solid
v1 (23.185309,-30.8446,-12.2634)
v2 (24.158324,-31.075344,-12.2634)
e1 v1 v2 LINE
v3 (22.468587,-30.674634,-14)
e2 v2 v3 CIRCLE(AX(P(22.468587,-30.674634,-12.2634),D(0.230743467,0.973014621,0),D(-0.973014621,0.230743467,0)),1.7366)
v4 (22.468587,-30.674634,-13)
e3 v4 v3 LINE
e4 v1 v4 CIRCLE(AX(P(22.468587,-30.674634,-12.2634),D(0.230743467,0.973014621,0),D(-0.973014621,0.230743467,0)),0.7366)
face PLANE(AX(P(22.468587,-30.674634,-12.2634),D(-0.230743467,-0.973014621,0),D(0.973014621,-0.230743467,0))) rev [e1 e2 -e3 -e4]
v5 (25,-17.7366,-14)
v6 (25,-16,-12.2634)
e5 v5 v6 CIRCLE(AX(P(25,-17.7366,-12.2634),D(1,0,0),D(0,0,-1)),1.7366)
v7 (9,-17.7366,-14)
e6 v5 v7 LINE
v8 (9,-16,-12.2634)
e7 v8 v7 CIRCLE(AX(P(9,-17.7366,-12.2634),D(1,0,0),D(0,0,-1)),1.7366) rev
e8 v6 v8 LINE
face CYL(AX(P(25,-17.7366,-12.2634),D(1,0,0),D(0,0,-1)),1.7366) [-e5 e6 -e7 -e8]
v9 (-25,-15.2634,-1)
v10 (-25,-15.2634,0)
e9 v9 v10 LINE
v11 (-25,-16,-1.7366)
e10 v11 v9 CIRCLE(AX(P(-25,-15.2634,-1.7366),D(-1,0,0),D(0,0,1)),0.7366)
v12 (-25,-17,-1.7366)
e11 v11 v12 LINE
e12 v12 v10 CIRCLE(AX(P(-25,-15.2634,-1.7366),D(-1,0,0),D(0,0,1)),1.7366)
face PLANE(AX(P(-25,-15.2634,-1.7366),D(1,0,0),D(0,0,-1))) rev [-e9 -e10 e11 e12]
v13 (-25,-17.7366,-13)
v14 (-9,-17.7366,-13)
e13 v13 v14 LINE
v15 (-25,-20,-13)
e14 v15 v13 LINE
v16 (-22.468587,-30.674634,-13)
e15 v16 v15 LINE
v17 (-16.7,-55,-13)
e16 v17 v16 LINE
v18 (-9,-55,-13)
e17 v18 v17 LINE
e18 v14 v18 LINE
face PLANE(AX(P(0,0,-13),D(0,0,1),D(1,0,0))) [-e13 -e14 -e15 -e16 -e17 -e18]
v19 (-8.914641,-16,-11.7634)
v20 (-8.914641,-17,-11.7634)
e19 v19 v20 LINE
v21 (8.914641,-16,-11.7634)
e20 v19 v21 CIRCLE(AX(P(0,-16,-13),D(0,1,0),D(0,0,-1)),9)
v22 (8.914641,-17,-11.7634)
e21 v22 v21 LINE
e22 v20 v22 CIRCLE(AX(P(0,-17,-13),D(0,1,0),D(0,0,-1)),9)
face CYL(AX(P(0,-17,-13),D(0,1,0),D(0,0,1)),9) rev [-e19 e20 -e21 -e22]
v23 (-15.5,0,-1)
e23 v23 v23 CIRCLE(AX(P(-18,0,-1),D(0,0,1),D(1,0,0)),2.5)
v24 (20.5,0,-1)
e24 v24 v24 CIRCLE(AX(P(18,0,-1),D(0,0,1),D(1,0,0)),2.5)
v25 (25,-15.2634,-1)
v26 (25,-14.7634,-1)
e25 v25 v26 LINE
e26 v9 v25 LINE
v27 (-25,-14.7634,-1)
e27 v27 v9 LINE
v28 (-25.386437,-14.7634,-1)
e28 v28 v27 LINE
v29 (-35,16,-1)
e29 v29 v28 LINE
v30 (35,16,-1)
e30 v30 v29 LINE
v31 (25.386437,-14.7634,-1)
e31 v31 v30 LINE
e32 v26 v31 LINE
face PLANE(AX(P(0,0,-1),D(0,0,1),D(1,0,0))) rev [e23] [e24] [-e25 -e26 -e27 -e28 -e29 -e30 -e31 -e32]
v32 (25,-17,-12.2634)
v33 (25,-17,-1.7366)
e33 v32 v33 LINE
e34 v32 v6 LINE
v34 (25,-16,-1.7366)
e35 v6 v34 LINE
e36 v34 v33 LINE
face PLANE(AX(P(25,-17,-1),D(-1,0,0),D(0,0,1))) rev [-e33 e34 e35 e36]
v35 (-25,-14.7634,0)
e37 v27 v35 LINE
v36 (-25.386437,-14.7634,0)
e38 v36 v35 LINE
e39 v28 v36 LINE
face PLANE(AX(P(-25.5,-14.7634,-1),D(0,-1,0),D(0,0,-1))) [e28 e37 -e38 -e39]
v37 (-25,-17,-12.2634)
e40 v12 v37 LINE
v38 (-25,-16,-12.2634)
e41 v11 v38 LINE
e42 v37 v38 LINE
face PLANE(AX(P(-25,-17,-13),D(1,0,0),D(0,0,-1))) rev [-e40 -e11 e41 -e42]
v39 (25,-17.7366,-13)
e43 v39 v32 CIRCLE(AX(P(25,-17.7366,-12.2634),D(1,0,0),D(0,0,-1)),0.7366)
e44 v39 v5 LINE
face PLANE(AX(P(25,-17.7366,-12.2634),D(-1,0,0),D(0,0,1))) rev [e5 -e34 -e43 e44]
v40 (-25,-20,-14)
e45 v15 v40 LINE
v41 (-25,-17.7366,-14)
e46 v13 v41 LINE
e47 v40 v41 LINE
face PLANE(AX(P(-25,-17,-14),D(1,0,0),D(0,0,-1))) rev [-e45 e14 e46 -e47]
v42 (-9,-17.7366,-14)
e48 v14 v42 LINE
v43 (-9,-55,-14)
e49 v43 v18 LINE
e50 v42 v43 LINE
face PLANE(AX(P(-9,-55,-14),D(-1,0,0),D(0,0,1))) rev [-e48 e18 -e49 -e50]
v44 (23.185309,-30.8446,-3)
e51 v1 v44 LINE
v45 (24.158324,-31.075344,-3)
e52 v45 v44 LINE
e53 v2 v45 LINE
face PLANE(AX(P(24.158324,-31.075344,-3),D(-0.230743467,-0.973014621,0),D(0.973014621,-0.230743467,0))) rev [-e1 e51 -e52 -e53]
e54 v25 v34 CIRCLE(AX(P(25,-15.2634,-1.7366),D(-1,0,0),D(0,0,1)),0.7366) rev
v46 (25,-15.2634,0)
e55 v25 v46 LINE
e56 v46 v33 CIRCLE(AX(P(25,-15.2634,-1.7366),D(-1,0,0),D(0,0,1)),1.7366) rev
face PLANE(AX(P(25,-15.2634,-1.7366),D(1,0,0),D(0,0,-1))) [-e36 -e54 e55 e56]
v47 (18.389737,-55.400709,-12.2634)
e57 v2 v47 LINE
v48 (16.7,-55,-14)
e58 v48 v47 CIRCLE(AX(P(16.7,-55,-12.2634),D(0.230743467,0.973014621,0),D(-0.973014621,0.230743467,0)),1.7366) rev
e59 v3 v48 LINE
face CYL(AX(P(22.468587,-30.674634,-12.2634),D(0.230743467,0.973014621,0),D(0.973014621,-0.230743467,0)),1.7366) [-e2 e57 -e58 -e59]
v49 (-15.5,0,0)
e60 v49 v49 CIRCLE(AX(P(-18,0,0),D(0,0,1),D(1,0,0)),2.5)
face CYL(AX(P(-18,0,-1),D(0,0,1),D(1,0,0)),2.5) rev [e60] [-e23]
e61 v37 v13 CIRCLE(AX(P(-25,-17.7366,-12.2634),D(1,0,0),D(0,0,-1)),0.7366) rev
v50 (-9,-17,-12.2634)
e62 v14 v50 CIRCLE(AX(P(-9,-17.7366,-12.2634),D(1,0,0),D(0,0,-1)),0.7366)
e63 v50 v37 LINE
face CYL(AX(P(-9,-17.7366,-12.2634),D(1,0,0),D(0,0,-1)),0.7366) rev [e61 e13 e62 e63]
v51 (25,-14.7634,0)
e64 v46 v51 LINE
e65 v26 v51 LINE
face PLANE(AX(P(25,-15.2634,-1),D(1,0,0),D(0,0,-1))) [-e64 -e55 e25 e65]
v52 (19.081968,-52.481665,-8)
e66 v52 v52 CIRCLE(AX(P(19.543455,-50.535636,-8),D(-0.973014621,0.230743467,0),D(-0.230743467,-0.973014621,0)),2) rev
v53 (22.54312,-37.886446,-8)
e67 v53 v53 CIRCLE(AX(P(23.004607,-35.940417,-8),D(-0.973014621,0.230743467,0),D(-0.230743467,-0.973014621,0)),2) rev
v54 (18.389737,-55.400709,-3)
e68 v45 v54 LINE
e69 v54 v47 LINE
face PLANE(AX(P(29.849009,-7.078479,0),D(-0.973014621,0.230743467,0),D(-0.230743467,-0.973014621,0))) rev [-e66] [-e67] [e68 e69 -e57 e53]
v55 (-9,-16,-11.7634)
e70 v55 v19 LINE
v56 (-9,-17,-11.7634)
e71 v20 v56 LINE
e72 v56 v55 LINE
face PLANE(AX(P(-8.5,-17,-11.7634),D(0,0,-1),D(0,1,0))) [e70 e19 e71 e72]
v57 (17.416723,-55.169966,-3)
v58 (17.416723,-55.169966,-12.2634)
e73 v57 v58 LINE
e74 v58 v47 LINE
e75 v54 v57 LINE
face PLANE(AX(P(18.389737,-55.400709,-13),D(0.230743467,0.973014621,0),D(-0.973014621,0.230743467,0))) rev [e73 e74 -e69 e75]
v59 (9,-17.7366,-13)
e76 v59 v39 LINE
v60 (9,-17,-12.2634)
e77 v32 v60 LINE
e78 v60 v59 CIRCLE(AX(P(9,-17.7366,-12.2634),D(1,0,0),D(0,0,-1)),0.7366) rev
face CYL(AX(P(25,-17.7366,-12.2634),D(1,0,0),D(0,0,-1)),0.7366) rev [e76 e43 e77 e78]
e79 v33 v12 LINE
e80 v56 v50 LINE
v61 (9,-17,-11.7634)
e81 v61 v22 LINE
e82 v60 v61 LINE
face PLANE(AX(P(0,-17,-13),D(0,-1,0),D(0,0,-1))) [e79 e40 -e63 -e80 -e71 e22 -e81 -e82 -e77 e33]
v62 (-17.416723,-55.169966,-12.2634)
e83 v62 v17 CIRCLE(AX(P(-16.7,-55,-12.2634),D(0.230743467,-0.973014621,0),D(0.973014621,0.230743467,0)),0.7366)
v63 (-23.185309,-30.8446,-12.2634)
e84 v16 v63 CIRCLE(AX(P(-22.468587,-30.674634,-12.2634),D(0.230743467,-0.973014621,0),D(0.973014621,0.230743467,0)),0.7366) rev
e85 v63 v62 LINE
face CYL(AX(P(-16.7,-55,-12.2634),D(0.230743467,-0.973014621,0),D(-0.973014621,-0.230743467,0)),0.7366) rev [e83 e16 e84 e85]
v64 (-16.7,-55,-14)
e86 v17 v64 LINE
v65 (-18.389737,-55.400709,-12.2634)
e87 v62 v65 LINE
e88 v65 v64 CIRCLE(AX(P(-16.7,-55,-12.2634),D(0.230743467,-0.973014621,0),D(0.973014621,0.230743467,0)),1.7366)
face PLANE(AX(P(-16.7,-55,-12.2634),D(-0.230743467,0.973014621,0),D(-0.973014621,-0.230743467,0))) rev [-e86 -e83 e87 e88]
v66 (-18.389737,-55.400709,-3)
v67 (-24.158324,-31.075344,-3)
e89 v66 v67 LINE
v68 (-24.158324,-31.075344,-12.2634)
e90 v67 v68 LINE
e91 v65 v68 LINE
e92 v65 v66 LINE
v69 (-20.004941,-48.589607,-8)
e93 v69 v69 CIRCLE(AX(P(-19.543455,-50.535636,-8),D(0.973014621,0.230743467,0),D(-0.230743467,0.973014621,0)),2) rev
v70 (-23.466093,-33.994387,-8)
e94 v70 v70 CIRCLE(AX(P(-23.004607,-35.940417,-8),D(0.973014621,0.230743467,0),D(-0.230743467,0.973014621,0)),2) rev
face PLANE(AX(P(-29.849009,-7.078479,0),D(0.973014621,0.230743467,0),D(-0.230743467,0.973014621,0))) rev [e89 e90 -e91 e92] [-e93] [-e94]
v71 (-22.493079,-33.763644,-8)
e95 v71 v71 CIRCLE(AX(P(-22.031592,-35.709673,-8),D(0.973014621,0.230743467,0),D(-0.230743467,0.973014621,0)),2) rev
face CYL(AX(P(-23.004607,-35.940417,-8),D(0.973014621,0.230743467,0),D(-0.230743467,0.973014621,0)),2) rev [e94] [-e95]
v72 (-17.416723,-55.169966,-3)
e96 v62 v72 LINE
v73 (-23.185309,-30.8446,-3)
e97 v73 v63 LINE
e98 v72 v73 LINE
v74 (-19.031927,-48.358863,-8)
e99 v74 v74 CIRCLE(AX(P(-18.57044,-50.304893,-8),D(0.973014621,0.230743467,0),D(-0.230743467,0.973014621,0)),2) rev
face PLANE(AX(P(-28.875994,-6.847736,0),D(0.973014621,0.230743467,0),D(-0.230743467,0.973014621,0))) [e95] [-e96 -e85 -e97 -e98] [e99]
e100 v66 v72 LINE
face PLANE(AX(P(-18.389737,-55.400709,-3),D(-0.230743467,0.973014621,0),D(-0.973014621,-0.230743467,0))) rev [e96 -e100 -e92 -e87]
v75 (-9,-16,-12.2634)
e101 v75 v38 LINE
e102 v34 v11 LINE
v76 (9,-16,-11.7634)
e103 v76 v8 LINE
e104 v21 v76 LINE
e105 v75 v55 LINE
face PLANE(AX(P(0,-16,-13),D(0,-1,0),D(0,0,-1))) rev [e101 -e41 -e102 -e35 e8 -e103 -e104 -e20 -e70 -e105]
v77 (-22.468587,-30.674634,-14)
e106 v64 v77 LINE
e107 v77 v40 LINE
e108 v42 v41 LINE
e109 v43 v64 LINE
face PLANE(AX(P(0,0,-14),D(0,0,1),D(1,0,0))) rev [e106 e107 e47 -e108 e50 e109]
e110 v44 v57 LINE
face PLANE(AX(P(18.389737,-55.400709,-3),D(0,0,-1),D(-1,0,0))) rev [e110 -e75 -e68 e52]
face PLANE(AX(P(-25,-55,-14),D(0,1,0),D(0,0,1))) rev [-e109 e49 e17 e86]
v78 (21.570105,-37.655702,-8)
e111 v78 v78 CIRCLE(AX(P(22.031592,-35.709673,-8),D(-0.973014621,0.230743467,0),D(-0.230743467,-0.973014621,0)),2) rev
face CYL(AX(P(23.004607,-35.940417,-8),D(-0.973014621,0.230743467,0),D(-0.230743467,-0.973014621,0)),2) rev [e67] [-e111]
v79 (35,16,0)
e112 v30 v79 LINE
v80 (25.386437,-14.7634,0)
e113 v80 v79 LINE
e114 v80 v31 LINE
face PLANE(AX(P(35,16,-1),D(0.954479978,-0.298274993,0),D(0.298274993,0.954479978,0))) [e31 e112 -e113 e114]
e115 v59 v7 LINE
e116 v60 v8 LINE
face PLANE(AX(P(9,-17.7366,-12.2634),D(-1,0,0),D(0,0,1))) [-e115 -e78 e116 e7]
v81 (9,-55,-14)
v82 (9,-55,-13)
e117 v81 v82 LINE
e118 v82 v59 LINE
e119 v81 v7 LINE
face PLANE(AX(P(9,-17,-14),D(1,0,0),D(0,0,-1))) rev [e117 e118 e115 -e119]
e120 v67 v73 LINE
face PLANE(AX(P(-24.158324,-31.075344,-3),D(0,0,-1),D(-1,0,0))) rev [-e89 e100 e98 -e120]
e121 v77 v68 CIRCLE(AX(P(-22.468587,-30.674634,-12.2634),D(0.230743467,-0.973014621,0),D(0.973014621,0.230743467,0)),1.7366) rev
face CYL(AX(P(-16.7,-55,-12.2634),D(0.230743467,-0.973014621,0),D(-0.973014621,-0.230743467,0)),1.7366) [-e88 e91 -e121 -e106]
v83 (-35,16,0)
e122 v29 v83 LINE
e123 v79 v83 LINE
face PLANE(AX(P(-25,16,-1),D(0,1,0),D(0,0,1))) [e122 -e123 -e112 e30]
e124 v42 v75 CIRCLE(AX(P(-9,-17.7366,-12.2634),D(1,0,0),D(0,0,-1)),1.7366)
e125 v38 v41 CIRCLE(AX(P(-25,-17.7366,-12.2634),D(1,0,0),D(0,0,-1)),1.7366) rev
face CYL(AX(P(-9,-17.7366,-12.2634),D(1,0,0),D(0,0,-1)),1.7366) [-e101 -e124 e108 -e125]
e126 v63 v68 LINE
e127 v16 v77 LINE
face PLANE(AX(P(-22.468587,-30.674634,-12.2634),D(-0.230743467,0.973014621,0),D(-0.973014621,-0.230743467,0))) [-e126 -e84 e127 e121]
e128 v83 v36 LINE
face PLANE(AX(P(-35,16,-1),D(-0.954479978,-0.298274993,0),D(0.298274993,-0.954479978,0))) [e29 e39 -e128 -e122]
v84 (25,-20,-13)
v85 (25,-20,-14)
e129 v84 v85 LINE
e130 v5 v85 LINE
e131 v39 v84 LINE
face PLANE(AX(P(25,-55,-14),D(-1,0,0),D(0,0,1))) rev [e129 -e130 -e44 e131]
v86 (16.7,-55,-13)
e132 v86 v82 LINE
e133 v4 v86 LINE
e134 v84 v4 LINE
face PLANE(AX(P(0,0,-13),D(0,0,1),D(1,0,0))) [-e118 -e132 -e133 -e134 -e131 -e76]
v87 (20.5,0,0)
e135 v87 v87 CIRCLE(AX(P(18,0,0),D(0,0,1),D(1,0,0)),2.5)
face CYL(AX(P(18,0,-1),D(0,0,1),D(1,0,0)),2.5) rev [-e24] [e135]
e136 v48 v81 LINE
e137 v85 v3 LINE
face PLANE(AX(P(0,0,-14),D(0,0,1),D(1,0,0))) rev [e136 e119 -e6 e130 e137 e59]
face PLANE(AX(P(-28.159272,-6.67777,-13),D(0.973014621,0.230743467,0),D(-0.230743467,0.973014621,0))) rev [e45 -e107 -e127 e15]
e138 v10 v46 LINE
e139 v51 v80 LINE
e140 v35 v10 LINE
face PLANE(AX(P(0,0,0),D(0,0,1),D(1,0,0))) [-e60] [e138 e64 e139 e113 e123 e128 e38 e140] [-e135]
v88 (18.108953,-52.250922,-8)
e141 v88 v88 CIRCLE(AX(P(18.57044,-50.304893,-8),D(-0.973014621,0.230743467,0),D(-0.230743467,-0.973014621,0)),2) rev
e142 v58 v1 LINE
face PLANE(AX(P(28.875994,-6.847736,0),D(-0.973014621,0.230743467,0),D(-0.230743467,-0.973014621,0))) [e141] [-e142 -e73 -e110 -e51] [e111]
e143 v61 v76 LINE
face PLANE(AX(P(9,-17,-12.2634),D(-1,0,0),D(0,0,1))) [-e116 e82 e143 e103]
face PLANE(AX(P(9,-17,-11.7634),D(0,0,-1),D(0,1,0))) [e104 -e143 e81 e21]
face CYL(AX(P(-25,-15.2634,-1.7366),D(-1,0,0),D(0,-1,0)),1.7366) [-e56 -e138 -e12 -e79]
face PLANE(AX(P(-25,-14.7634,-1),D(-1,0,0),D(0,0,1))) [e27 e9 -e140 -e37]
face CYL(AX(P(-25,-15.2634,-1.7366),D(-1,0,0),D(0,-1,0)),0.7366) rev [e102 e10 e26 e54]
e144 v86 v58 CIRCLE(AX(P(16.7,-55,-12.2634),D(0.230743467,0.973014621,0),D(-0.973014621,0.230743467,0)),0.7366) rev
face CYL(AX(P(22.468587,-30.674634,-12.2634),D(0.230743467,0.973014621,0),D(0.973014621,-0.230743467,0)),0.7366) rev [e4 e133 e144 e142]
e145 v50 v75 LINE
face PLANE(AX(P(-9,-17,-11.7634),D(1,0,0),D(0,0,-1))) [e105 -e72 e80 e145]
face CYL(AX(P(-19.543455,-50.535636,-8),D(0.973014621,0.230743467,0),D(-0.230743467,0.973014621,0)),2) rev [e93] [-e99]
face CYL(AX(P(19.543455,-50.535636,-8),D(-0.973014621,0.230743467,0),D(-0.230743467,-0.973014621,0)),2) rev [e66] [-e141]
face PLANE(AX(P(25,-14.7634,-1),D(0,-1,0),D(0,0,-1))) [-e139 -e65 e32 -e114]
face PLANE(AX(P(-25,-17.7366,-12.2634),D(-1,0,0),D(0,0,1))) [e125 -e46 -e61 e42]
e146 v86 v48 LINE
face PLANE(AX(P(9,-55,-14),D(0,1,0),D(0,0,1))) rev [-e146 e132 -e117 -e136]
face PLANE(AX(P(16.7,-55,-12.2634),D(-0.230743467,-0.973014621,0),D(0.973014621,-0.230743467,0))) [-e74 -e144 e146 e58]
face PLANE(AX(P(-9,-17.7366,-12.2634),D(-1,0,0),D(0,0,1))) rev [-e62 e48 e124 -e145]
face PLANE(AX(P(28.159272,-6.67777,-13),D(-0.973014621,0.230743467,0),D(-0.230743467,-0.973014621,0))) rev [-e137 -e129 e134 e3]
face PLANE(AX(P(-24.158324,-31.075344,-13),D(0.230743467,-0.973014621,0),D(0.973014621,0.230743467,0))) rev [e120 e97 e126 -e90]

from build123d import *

# Parameters (mm, degrees)
IZIM1_R                         = 2.5
TABAN_FLAN_1_DEPTH              = 1
KENAR_FLAN_1_STRIP_W            = 5.4732
KENAR_FLAN_1_STRIP_H            = 1
KENAR_FLAN_1_STRIP_CUT_DEPTH    = 50
KENAR_FLAN_1_RELIEF_W           = 5.9732
KENAR_FLAN_1_RELIEF_H           = 0.5
KENAR_FLAN_1_RELIEF_CUT_DEPTH   = 1
KENAR_FLAN_1_DEPTH              = 50
KENAR_FLAN_1_START              = 1
KENAR_FLAN_1_FLAT_DEPTH         = 1
KENAR_FLAN_2_STRIP_W            = 5.4732
KENAR_FLAN_2_STRIP_H            = 1
KENAR_FLAN_2_STRIP_CUT_DEPTH    = 16
KENAR_FLAN_2_RELIEF_W           = 5.9732
KENAR_FLAN_2_RELIEF_H           = 0.5
KENAR_FLAN_2_RELIEF_CUT_DEPTH   = 1
KENAR_FLAN_2_STRIP_2_W          = 5.4732
KENAR_FLAN_2_STRIP_2_H          = 1
KENAR_FLAN_2_STRIP_CUT_2_DEPTH  = 16
KENAR_FLAN_2_RELIEF_2_W         = 5.9732
KENAR_FLAN_2_RELIEF_2_H         = 0.5
KENAR_FLAN_2_RELIEF_CUT_2_DEPTH = 1
KENAR_FLAN_2_DEPTH              = 16
KENAR_FLAN_2_BEND_DEPTH         = 16
KES_EKSTR_ZYON1_DEPTH           = 10
KENAR_FLAN_3_DEPTH              = 25
KENAR_FLAN_3_START              = 1
KENAR_FLAN_3_PROFILE_W          = 25
KENAR_FLAN_3_PROFILE_H          = 9.2634
KENAR_FLAN_3_PROFILE_R          = 2
KENAR_FLAN_3_FLAT_DEPTH         = 1
KENAR_FLAN_3_BEND_DEPTH         = 25
KENAR_FLAN_3_PROFILE_2_W        = 25
KENAR_FLAN_3_PROFILE_2_H        = 9.2634
KENAR_FLAN_3_PROFILE_2_R        = 2
KENAR_FLAN_3_FLAT_2_DEPTH       = 1


# Sheet-metal steps are written as plain solids
with BuildPart() as part:
    # Çizim1 → Taban-Flanş1 (new body)
    with BuildSketch(Plane.XY):
        Polygon((-25, 16), (25, 16), (35, 16), (25, -16), (-25, -16), (-35, 16), align=None)
        with Locations((-18, 0)):
            Circle(IZIM1_R, mode=Mode.SUBTRACT)
        with Locations((18, 0)):
            Circle(IZIM1_R, mode=Mode.SUBTRACT)
    extrude(amount=-TABAN_FLAN_1_DEPTH)

    # Kenar-Flanş1 strip (across the edge) → Kenar-Flanş1 strip cut (cut)
    with BuildSketch(Plane(origin=(25, -16, -1), x_dir=(0, 1, 0), z_dir=(-1, 0, 0))):
        with Locations((-2, -0.5)):
            Rectangle(KENAR_FLAN_1_STRIP_W, KENAR_FLAN_1_STRIP_H)
    extrude(amount=KENAR_FLAN_1_STRIP_CUT_DEPTH, mode=Mode.SUBTRACT)

    # Kenar-Flanş1 relief (on the sheet) → Kenar-Flanş1 relief cut (cut)
    with BuildSketch(Plane(origin=(25, -15.2634, -1), x_dir=(0, 1, 0), z_dir=(0, 0, -1))):
        with Locations((-2.4866, 0.25)):
            Rectangle(KENAR_FLAN_1_RELIEF_W, KENAR_FLAN_1_RELIEF_H)
        with Locations((-2.4866, -50.25)):
            Rectangle(KENAR_FLAN_1_RELIEF_W, KENAR_FLAN_1_RELIEF_H)
    extrude(amount=-KENAR_FLAN_1_RELIEF_CUT_DEPTH, mode=Mode.SUBTRACT)

    # Kenar-Flanş1 bend section (across the edge) → Kenar-Flanş1 (add)
    with BuildSketch(Plane(origin=(25, -16, -1), x_dir=(0, 1, 0), z_dir=(-1, 0, 0))):
        with BuildLine():
            Line((-1, 0.7366), (0, 0.7366))
            ThreePointArc((0, 0.7366), (0.215745145, 0.215745145), (0.7366, 0))
            Line((0.7366, 0), (0.7366, -1))
            ThreePointArc((0.7366, -1), (-0.491361636, -0.491361636), (-1, 0.7366))
        make_face()
    extrude(amount=KENAR_FLAN_1_DEPTH)

    # Kenar-Flanş1 profile (on flange) → Kenar-Flanş1 flat (add)
    with BuildSketch(Plane(origin=(0, -16, -1), x_dir=(-1, 0, 0), z_dir=(0, -1, 0)).offset(KENAR_FLAN_1_START)):
        with BuildLine():
            Line((25, 0.7366), (25, 12))
            Line((25, 12), (9, 12))
            ThreePointArc((9, 12), (0, 3), (-9, 12))
            Line((-9, 12), (-25, 12))
            Line((-25, 12), (-25, 0.7366))
            Line((-25, 0.7366), (25, 0.7366))
        make_face()
    extrude(amount=-KENAR_FLAN_1_FLAT_DEPTH)

    # Kenar-Flanş2 strip (across the edge) → Kenar-Flanş2 strip cut (cut)
    with BuildSketch(Plane(origin=(9, -17, -13), x_dir=(0, 0, 1), z_dir=(1, 0, 0))):
        with Locations((-2, -0.5)):
            Rectangle(KENAR_FLAN_2_STRIP_W, KENAR_FLAN_2_STRIP_H)
    extrude(amount=KENAR_FLAN_2_STRIP_CUT_DEPTH, mode=Mode.SUBTRACT)

    # Kenar-Flanş2 relief (on the sheet) → Kenar-Flanş2 relief cut (cut)
    with BuildSketch(Plane(origin=(9, -17, -12.2634), x_dir=(0, 0, 1), z_dir=(0, -1, 0))):
        with Locations((-2.4866, 0.25)):
            Rectangle(KENAR_FLAN_2_RELIEF_W, KENAR_FLAN_2_RELIEF_H)
    extrude(amount=-KENAR_FLAN_2_RELIEF_CUT_DEPTH, mode=Mode.SUBTRACT)

    # Kenar-Flanş2 strip 2 (across the edge) → Kenar-Flanş2 strip cut 2 (cut)
    with BuildSketch(Plane(origin=(-25, -17, -13), x_dir=(0, 0, 1), z_dir=(1, 0, 0))):
        with Locations((-2, -0.5)):
            Rectangle(KENAR_FLAN_2_STRIP_2_W, KENAR_FLAN_2_STRIP_2_H)
    extrude(amount=KENAR_FLAN_2_STRIP_CUT_2_DEPTH, mode=Mode.SUBTRACT)

    # Kenar-Flanş2 relief 2 (on the sheet) → Kenar-Flanş2 relief cut 2 (cut)
    with BuildSketch(Plane(origin=(-25, -17, -12.2634), x_dir=(0, 0, 1), z_dir=(0, -1, 0))):
        with Locations((-2.4866, -16.25)):
            Rectangle(KENAR_FLAN_2_RELIEF_2_W, KENAR_FLAN_2_RELIEF_2_H)
    extrude(amount=-KENAR_FLAN_2_RELIEF_CUT_2_DEPTH, mode=Mode.SUBTRACT)

    # Kenar-Flanş2 section (across the edge) → Kenar-Flanş2 (add)
    with BuildSketch(Plane(origin=(9, -17, -13), x_dir=(0, 0, 1), z_dir=(1, 0, 0))):
        with BuildLine():
            Line((-1, 0.7366), (-1, 38))
            Line((-1, 38), (0, 38))
            Line((0, 38), (0, 0.7366))
            ThreePointArc((0, 0.7366), (0.215745145, 0.215745145), (0.7366, 0))
            Line((0.7366, 0), (0.7366, -1))
            ThreePointArc((0.7366, -1), (-0.491361636, -0.491361636), (-1, 0.7366))
        make_face()
    extrude(amount=KENAR_FLAN_2_DEPTH)

    # Kenar-Flanş2 section 2 (across the edge) → Kenar-Flanş2 bend (add)
    with BuildSketch(Plane(origin=(-25, -17, -13), x_dir=(0, 0, 1), z_dir=(1, 0, 0))):
        with BuildLine():
            Line((-1, 0.7366), (-1, 38))
            Line((-1, 38), (0, 38))
            Line((0, 38), (0, 0.7366))
            ThreePointArc((0, 0.7366), (0.215745145, 0.215745145), (0.7366, 0))
            Line((0.7366, 0), (0.7366, -1))
            ThreePointArc((0.7366, -1), (-0.491361636, -0.491361636), (-1, 0.7366))
        make_face()
    extrude(amount=KENAR_FLAN_2_BEND_DEPTH)

    # Çizim11 → Kes-Ekstrüzyon1 (cut)
    with BuildSketch(Plane(origin=(0, 0, -14), x_dir=(-1, 0, 0), z_dir=(0, 0, -1))):
        Polygon((-16.7, -55), (-25, -20), (-25, -55), align=None)
        Polygon((25, -55), (16.7, -55), (25, -20), align=None)
    extrude(amount=-KES_EKSTR_ZYON1_DEPTH, mode=Mode.SUBTRACT)

    # Kenar-Flanş3 bend section (across the edge) → Kenar-Flanş3 (add)
    with BuildSketch(Plane(origin=(17.41672257, -55.169965638, -13), x_dir=(-0.973014620822144, 0.23074346722353695, 3.4914813388431334e-15), z_dir=(0.23074346722353695, 0.973014620822144, 0))):
        with BuildLine():
            Line((-1, 0.7366), (0, 0.7366))
            ThreePointArc((0, 0.7366), (0.215745145, 0.215745145), (0.7366, 0))
            Line((0.7366, 0), (0.7366, -1))
            ThreePointArc((0.7366, -1), (-0.491361636, -0.491361636), (-1, 0.7366))
        make_face()
    extrude(amount=KENAR_FLAN_3_DEPTH)

    # Kenar-Flanş3 profile (on flange) → Kenar-Flanş3 flat (add)
    with BuildSketch(Plane(origin=(28.875994223, -6.847735773, -13), x_dir=(0.23074346722353695, 0.973014620822144, 0), z_dir=(0.973014620822144, -0.23074346722353695, -3.4914813388431334e-15)).offset(KENAR_FLAN_3_START)):
        with Locations((-37.162388243, 5.3683)):
            Rectangle(KENAR_FLAN_3_PROFILE_W, KENAR_FLAN_3_PROFILE_H)
        with Locations((-44.662388243, 5)):
            Circle(KENAR_FLAN_3_PROFILE_R, mode=Mode.SUBTRACT)
        with Locations((-29.662388243, 5)):
            Circle(KENAR_FLAN_3_PROFILE_R, mode=Mode.SUBTRACT)
    extrude(amount=-KENAR_FLAN_3_FLAT_DEPTH)

    # Kenar-Flanş3 bend section 2 (across the edge) → Kenar-Flanş3 bend (add)
    with BuildSketch(Plane(origin=(-23.18530925, -30.844600117, -13), x_dir=(0.973014620822144, 0.2307434672235371, 3.807964708569791e-15), z_dir=(0.2307434672235371, -0.973014620822144, 0))):
        with BuildLine():
            Line((-1, 0.7366), (0, 0.7366))
            ThreePointArc((0, 0.7366), (0.215745145, 0.215745145), (0.7366, 0))
            Line((0.7366, 0), (0.7366, -1))
            ThreePointArc((0.7366, -1), (-0.491361636, -0.491361636), (-1, 0.7366))
        make_face()
    extrude(amount=KENAR_FLAN_3_BEND_DEPTH)

    # Kenar-Flanş3 profile 2 (on flange) → Kenar-Flanş3 flat 2 (add)
    with BuildSketch(Plane(origin=(-28.875994223, -6.847735773, -13), x_dir=(0.2307434672235371, -0.973014620822144, 0), z_dir=(-0.973014620822144, -0.2307434672235371, -3.807964708569791e-15)).offset(KENAR_FLAN_3_START)):
        with Locations((37.162388243, 5.3683)):
            Rectangle(KENAR_FLAN_3_PROFILE_2_W, KENAR_FLAN_3_PROFILE_2_H)
        with Locations((29.662388243, 5)):
            Circle(KENAR_FLAN_3_PROFILE_2_R, mode=Mode.SUBTRACT)
        with Locations((44.662388243, 5)):
            Circle(KENAR_FLAN_3_PROFILE_2_R, mode=Mode.SUBTRACT)
    extrude(amount=-KENAR_FLAN_3_FLAT_2_DEPTH)


solid = part.part
